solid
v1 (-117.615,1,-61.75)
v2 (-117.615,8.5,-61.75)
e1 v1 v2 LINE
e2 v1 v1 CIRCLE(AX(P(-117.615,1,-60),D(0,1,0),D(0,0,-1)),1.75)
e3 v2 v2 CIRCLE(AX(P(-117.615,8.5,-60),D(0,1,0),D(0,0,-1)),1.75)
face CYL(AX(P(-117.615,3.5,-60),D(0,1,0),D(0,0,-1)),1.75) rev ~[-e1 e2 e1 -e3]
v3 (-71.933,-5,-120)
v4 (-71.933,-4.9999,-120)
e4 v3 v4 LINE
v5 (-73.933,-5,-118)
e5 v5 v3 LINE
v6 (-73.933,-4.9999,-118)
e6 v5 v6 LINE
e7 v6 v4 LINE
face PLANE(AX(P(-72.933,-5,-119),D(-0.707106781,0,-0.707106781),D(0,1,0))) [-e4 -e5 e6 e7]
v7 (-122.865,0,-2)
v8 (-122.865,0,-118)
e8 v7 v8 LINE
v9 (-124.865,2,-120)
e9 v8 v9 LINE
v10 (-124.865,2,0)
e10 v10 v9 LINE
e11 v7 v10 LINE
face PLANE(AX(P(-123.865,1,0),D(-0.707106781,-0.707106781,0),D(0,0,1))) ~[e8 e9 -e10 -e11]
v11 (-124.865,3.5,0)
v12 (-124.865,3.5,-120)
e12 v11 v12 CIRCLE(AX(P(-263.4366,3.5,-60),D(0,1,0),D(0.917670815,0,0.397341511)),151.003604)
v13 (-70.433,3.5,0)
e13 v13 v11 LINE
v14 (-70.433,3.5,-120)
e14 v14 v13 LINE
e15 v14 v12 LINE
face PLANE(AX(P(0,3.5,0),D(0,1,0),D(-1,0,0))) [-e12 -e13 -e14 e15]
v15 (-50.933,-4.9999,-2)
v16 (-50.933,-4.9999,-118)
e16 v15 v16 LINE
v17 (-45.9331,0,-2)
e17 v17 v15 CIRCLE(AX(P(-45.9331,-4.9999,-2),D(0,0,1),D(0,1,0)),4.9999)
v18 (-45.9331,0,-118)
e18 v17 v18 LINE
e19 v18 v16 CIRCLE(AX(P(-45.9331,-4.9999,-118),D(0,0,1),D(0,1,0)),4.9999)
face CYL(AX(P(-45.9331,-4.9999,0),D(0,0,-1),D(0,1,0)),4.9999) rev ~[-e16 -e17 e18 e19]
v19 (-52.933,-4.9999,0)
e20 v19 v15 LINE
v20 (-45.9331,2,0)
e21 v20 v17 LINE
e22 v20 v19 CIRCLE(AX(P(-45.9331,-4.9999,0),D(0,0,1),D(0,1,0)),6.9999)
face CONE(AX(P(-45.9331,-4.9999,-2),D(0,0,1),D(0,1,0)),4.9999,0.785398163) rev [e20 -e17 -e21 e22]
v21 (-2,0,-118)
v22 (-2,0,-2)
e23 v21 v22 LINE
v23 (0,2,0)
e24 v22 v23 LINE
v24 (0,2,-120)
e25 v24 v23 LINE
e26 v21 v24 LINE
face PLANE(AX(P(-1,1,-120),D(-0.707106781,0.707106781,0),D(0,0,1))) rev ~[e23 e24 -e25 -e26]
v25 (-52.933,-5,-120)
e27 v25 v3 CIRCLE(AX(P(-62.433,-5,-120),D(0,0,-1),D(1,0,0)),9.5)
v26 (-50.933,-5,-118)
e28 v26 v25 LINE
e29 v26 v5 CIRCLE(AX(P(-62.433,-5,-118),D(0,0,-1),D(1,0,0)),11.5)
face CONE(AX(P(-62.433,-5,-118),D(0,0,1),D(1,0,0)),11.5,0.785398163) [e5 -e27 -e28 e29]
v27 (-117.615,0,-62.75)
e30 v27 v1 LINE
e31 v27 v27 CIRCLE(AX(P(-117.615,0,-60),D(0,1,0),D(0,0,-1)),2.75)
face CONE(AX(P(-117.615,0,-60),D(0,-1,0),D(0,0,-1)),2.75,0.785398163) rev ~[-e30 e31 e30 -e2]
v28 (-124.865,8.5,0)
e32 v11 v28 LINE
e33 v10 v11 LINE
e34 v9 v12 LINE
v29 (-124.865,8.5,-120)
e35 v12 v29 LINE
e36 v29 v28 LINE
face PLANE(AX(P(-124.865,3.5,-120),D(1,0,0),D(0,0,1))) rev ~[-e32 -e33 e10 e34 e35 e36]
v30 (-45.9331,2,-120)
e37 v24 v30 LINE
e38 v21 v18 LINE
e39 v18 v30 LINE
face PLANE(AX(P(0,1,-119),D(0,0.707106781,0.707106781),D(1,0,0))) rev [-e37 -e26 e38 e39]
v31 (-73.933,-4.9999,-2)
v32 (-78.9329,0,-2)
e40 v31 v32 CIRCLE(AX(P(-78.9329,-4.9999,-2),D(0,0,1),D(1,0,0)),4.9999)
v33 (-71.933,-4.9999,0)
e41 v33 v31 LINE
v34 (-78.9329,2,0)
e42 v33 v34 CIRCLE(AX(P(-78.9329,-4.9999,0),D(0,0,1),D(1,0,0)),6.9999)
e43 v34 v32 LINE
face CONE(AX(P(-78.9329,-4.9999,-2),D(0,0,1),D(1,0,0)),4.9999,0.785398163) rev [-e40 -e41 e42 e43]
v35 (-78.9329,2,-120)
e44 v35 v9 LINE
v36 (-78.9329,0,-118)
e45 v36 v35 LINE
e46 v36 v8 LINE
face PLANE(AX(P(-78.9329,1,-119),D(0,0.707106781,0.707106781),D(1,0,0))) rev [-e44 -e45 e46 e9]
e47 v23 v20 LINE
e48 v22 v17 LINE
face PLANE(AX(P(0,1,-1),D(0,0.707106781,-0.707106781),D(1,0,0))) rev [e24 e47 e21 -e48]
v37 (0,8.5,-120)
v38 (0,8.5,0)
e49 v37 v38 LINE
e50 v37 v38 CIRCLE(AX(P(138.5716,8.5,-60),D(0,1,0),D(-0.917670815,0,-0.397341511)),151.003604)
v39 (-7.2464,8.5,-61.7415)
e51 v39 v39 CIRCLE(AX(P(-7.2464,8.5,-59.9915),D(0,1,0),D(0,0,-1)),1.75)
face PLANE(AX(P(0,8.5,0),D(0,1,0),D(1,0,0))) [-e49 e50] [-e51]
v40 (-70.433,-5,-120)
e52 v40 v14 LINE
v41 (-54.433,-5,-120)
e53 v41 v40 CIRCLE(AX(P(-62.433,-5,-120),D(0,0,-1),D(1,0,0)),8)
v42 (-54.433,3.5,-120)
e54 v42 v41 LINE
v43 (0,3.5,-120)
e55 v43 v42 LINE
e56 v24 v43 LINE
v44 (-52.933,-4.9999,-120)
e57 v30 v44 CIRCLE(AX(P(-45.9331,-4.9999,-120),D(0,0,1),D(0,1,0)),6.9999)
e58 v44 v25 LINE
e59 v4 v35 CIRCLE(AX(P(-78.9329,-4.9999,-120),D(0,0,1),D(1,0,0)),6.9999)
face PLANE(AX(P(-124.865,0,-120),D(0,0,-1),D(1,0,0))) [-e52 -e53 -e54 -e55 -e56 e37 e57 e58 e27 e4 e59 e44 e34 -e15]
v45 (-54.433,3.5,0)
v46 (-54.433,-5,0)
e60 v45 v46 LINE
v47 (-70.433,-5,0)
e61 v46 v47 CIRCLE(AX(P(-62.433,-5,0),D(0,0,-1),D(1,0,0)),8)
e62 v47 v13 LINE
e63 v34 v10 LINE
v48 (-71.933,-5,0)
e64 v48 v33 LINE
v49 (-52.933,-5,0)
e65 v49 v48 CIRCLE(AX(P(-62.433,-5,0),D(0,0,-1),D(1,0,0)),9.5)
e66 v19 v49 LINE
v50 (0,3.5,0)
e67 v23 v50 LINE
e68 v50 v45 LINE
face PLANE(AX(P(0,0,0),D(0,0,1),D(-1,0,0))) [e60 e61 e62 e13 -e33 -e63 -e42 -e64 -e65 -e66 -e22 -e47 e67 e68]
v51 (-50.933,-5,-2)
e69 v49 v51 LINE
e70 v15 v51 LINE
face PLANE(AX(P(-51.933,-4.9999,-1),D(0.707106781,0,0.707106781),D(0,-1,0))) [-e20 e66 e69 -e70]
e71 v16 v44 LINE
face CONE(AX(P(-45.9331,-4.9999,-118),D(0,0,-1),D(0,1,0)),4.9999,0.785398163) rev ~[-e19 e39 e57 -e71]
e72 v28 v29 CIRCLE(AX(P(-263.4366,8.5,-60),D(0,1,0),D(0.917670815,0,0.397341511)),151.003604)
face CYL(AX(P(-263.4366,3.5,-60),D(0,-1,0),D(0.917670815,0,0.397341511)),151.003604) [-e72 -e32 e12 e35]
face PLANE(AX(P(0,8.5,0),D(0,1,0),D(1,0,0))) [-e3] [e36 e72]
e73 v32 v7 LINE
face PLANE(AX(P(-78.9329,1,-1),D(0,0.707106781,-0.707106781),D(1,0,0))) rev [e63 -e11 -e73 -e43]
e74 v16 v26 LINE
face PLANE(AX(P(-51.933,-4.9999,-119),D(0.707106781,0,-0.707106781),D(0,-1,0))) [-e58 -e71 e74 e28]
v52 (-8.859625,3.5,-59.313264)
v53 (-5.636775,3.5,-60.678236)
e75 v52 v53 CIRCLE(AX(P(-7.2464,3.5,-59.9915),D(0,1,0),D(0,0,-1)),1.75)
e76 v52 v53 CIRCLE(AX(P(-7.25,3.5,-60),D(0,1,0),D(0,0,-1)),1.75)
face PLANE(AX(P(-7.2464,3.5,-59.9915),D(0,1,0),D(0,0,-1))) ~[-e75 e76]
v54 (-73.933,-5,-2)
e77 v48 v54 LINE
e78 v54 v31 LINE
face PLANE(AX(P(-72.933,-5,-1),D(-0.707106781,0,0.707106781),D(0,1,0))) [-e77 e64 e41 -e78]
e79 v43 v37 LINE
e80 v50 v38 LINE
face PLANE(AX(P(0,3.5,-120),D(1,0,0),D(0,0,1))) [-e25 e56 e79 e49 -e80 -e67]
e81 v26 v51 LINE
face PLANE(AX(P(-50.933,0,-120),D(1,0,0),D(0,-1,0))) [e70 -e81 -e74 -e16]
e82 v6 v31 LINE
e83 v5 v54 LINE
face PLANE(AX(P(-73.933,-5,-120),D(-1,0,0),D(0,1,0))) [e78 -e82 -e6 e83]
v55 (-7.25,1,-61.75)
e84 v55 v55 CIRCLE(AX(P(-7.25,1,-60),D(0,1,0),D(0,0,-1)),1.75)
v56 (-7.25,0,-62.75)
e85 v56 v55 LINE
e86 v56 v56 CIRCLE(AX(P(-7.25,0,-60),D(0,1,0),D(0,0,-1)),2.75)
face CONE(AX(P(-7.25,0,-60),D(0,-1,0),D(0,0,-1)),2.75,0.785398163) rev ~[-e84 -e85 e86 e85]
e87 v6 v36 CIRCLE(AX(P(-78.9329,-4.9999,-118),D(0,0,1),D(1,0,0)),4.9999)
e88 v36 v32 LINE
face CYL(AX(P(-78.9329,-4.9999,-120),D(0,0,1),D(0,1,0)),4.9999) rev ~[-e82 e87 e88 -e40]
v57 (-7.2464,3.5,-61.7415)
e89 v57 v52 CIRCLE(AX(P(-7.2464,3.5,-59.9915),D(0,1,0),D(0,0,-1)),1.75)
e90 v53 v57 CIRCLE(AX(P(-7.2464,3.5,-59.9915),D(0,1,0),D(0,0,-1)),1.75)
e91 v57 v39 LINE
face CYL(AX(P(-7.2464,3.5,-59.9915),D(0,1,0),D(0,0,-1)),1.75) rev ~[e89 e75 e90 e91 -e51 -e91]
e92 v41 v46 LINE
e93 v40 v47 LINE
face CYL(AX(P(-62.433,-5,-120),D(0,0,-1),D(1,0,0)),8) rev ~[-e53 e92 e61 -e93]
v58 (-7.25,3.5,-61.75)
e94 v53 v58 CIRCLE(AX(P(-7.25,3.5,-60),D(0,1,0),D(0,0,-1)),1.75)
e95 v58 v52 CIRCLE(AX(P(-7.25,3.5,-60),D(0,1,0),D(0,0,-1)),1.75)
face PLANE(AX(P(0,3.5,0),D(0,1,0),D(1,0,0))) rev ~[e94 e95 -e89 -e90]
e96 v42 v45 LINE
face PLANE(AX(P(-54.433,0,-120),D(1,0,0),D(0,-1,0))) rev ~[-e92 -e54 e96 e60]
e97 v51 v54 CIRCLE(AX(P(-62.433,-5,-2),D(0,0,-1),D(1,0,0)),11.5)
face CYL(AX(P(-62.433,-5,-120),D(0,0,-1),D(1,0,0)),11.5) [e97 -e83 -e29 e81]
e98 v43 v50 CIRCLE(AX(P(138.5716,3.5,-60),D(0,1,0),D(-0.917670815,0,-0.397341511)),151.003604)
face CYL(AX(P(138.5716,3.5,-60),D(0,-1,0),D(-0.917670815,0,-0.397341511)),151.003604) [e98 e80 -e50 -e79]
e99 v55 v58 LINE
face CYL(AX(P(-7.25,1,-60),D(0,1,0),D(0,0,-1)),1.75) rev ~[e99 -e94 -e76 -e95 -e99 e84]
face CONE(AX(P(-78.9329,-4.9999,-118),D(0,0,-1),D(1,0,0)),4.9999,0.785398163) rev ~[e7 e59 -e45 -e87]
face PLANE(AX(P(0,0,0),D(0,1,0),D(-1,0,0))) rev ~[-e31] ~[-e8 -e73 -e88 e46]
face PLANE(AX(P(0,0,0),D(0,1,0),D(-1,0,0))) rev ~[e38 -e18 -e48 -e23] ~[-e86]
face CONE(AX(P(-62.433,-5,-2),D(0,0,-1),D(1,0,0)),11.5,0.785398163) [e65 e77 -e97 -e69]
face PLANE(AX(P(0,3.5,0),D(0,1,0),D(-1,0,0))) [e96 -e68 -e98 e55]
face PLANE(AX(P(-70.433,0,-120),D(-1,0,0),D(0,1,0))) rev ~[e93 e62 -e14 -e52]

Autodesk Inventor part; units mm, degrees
ref_plane "YZ Plane" through (0, 0, 0) normal (1, 0, 0) x (0, 1, 0)
ref_plane "XZ Plane" through (0, 0, 0) normal (0, 1, 0) x (-1, 0, 0)
ref_plane "XY Plane" through (0, 0, 0) normal (0, 0, 1) x (1, 0, 0)
sketch "Sketch1" plane through (0, 0, 0) normal (0, 1, 0) x (-1, 0, 0)
  line L0 (0, 0) -> (124.865, 0)
  line L1 (124.865, 0) -> (124.865, -120)
  line L2 (124.865, -120) -> (0, -120)
  line L3 (0, -120) -> (0, 0)
  dimension "d0" = 124.865
  dimension "d1" = 120
extrude "Extrusion1" add sketch "Sketch1" along normal blind 3.5
sketch "Sketch2" plane through (0, 0, 0) normal (0, -1, 0) x (1, 0, 0)
  circle A0 centre (-117.615, -60) radius 1.75
  circle A1 centre (-7.25, -60) radius 1.75
  line L0 (-124.865, 0) -> (-124.865, -120) projected
  line L1 (0, 0) -> (-124.865, 0) projected
  line L2 (0, -120) -> (0, 0) projected
  dimension "d4" = 3.5
  dimension "d5" = 3.5
  dimension "d6" = 7.25
  dimension "d7" = 60
  dimension "d8" = 7.25
  dimension "d9" = 60
hole "Hole1" at (-7.25, 0, -60) at (-117.615, 0, -60) direction (0, 1, 0) diameter 3.5 end through all countersink diameter 5.5 countersink angle 90
sketch "Sketch3" plane through (0, 0, -120) normal (0, 0, -1) x (-1, 0, 0)
  line L0 (73.933, -5) -> (73.933, 0)
  line L1 (70.433, 0) -> (70.433, -5)
  line L2 (50.933, 0) -> (50.933, -5)
  line L3 (54.433, -5) -> (54.433, 0)
  arc A0 (54.433, -5) -> (70.433, -5) centre (62.433, -5) ccw
  arc A1 (50.933, -5) -> (73.933, -5) centre (62.433, -5) ccw
  line L4 (73.933, 0) -> (73.933, 3.5)
  line L5 (0, 3.5) -> (124.865, 3.5) projected
  line L6 (50.933, 0) -> (50.933, 3.5)
  line L7 (73.933, 3.5) -> (50.933, 3.5)
  line L8 (70.433, 0) -> (54.433, 0)
  line L9 (124.865, 0) -> (0, 0) projected
  dimension "d22" = 3.5
  dimension "d24" = 3.5
extrude "Extrusion2" add sketch "Sketch3" against normal blind 120
sketch "Sketch4" plane through (0, 3.5, -120) normal (0, 0, -1) x (-1, 0, 0)
  line L0 (124.865, -3.5) -> (124.865, 0) projected
  line L1 (70.433, -3.5) -> (70.433, -8.5)
  line L2 (54.433, -3.5) -> (54.433, -8.5)
  arc A0 (54.433, -8.5) -> (70.433, -8.5) centre (62.433, -8.5) ccw
  line L3 (70.433, -3.5) -> (70.433, 0)
  line L4 (70.433, 0) -> (54.433, 0)
  line L5 (54.433, 0) -> (54.433, -3.5)
  point P0 (0, -3.5)
extrude "Extrusion3" cut sketch "Sketch4" against normal blind 120
sketch "Sketch5" plane through (0, 3.5, 0) normal (0, 1, 0) x (1, 0, 0)
  line L0 (0, 120) -> (0, 0) projected
  arc A0 (0, 120) -> (0, 0) centre (138.5716, 60) ccw
  line L1 (-70.433, 120) -> (-124.865, 120) projected
  arc A1 (-124.865, 0) -> (-124.865, 120) centre (-262.4456, 60) ccw
extrude "Extrusion4" add sketch "Sketch5" along normal blind 5
sketch "Sketch6" plane through (0, 3.5, 0) normal (0, 1, 0) x (1, 0, 0)
  line L0 (-124.865, 120) -> (-124.865, 0) projected
  arc A0 (-124.865, 0) -> (-124.865, 120) centre (-263.4366, 60) ccw
  point P0 (0, 0)
extrude "Extrusion5" add sketch "Sketch6" along normal blind 5
hole "Hole3" at (-117.615, 3.5, -60) direction (0, 1, 0) diameter 3.5 end through all
hole "Hole4" at (-7.2464, 3.5, -59.9915) direction (0, 1, 0) diameter 3.5 end through all
fillet "Fillet2" radius 5 2 edges at (-50.933, 0, -60) (-73.933, 0, -60)
chamfer "Chamfer1" distance 2 angle 45 12 edges at (-124.865, 0, -60) (0, 0, -60) (-62.433, -16.5, -120) (-49.4686, -1.4644, -120) (-22.9665, 0, -120) (-75.3974, -1.4644, -120) (-101.8989, 0, -120) (-62.433, -16.5, 0) (-49.4686, -1.4644, 0) (-22.9665, 0, 0) (-75.3974, -1.4644, 0) (-101.8989, 0, 0)
properties part number "FinalBack"
